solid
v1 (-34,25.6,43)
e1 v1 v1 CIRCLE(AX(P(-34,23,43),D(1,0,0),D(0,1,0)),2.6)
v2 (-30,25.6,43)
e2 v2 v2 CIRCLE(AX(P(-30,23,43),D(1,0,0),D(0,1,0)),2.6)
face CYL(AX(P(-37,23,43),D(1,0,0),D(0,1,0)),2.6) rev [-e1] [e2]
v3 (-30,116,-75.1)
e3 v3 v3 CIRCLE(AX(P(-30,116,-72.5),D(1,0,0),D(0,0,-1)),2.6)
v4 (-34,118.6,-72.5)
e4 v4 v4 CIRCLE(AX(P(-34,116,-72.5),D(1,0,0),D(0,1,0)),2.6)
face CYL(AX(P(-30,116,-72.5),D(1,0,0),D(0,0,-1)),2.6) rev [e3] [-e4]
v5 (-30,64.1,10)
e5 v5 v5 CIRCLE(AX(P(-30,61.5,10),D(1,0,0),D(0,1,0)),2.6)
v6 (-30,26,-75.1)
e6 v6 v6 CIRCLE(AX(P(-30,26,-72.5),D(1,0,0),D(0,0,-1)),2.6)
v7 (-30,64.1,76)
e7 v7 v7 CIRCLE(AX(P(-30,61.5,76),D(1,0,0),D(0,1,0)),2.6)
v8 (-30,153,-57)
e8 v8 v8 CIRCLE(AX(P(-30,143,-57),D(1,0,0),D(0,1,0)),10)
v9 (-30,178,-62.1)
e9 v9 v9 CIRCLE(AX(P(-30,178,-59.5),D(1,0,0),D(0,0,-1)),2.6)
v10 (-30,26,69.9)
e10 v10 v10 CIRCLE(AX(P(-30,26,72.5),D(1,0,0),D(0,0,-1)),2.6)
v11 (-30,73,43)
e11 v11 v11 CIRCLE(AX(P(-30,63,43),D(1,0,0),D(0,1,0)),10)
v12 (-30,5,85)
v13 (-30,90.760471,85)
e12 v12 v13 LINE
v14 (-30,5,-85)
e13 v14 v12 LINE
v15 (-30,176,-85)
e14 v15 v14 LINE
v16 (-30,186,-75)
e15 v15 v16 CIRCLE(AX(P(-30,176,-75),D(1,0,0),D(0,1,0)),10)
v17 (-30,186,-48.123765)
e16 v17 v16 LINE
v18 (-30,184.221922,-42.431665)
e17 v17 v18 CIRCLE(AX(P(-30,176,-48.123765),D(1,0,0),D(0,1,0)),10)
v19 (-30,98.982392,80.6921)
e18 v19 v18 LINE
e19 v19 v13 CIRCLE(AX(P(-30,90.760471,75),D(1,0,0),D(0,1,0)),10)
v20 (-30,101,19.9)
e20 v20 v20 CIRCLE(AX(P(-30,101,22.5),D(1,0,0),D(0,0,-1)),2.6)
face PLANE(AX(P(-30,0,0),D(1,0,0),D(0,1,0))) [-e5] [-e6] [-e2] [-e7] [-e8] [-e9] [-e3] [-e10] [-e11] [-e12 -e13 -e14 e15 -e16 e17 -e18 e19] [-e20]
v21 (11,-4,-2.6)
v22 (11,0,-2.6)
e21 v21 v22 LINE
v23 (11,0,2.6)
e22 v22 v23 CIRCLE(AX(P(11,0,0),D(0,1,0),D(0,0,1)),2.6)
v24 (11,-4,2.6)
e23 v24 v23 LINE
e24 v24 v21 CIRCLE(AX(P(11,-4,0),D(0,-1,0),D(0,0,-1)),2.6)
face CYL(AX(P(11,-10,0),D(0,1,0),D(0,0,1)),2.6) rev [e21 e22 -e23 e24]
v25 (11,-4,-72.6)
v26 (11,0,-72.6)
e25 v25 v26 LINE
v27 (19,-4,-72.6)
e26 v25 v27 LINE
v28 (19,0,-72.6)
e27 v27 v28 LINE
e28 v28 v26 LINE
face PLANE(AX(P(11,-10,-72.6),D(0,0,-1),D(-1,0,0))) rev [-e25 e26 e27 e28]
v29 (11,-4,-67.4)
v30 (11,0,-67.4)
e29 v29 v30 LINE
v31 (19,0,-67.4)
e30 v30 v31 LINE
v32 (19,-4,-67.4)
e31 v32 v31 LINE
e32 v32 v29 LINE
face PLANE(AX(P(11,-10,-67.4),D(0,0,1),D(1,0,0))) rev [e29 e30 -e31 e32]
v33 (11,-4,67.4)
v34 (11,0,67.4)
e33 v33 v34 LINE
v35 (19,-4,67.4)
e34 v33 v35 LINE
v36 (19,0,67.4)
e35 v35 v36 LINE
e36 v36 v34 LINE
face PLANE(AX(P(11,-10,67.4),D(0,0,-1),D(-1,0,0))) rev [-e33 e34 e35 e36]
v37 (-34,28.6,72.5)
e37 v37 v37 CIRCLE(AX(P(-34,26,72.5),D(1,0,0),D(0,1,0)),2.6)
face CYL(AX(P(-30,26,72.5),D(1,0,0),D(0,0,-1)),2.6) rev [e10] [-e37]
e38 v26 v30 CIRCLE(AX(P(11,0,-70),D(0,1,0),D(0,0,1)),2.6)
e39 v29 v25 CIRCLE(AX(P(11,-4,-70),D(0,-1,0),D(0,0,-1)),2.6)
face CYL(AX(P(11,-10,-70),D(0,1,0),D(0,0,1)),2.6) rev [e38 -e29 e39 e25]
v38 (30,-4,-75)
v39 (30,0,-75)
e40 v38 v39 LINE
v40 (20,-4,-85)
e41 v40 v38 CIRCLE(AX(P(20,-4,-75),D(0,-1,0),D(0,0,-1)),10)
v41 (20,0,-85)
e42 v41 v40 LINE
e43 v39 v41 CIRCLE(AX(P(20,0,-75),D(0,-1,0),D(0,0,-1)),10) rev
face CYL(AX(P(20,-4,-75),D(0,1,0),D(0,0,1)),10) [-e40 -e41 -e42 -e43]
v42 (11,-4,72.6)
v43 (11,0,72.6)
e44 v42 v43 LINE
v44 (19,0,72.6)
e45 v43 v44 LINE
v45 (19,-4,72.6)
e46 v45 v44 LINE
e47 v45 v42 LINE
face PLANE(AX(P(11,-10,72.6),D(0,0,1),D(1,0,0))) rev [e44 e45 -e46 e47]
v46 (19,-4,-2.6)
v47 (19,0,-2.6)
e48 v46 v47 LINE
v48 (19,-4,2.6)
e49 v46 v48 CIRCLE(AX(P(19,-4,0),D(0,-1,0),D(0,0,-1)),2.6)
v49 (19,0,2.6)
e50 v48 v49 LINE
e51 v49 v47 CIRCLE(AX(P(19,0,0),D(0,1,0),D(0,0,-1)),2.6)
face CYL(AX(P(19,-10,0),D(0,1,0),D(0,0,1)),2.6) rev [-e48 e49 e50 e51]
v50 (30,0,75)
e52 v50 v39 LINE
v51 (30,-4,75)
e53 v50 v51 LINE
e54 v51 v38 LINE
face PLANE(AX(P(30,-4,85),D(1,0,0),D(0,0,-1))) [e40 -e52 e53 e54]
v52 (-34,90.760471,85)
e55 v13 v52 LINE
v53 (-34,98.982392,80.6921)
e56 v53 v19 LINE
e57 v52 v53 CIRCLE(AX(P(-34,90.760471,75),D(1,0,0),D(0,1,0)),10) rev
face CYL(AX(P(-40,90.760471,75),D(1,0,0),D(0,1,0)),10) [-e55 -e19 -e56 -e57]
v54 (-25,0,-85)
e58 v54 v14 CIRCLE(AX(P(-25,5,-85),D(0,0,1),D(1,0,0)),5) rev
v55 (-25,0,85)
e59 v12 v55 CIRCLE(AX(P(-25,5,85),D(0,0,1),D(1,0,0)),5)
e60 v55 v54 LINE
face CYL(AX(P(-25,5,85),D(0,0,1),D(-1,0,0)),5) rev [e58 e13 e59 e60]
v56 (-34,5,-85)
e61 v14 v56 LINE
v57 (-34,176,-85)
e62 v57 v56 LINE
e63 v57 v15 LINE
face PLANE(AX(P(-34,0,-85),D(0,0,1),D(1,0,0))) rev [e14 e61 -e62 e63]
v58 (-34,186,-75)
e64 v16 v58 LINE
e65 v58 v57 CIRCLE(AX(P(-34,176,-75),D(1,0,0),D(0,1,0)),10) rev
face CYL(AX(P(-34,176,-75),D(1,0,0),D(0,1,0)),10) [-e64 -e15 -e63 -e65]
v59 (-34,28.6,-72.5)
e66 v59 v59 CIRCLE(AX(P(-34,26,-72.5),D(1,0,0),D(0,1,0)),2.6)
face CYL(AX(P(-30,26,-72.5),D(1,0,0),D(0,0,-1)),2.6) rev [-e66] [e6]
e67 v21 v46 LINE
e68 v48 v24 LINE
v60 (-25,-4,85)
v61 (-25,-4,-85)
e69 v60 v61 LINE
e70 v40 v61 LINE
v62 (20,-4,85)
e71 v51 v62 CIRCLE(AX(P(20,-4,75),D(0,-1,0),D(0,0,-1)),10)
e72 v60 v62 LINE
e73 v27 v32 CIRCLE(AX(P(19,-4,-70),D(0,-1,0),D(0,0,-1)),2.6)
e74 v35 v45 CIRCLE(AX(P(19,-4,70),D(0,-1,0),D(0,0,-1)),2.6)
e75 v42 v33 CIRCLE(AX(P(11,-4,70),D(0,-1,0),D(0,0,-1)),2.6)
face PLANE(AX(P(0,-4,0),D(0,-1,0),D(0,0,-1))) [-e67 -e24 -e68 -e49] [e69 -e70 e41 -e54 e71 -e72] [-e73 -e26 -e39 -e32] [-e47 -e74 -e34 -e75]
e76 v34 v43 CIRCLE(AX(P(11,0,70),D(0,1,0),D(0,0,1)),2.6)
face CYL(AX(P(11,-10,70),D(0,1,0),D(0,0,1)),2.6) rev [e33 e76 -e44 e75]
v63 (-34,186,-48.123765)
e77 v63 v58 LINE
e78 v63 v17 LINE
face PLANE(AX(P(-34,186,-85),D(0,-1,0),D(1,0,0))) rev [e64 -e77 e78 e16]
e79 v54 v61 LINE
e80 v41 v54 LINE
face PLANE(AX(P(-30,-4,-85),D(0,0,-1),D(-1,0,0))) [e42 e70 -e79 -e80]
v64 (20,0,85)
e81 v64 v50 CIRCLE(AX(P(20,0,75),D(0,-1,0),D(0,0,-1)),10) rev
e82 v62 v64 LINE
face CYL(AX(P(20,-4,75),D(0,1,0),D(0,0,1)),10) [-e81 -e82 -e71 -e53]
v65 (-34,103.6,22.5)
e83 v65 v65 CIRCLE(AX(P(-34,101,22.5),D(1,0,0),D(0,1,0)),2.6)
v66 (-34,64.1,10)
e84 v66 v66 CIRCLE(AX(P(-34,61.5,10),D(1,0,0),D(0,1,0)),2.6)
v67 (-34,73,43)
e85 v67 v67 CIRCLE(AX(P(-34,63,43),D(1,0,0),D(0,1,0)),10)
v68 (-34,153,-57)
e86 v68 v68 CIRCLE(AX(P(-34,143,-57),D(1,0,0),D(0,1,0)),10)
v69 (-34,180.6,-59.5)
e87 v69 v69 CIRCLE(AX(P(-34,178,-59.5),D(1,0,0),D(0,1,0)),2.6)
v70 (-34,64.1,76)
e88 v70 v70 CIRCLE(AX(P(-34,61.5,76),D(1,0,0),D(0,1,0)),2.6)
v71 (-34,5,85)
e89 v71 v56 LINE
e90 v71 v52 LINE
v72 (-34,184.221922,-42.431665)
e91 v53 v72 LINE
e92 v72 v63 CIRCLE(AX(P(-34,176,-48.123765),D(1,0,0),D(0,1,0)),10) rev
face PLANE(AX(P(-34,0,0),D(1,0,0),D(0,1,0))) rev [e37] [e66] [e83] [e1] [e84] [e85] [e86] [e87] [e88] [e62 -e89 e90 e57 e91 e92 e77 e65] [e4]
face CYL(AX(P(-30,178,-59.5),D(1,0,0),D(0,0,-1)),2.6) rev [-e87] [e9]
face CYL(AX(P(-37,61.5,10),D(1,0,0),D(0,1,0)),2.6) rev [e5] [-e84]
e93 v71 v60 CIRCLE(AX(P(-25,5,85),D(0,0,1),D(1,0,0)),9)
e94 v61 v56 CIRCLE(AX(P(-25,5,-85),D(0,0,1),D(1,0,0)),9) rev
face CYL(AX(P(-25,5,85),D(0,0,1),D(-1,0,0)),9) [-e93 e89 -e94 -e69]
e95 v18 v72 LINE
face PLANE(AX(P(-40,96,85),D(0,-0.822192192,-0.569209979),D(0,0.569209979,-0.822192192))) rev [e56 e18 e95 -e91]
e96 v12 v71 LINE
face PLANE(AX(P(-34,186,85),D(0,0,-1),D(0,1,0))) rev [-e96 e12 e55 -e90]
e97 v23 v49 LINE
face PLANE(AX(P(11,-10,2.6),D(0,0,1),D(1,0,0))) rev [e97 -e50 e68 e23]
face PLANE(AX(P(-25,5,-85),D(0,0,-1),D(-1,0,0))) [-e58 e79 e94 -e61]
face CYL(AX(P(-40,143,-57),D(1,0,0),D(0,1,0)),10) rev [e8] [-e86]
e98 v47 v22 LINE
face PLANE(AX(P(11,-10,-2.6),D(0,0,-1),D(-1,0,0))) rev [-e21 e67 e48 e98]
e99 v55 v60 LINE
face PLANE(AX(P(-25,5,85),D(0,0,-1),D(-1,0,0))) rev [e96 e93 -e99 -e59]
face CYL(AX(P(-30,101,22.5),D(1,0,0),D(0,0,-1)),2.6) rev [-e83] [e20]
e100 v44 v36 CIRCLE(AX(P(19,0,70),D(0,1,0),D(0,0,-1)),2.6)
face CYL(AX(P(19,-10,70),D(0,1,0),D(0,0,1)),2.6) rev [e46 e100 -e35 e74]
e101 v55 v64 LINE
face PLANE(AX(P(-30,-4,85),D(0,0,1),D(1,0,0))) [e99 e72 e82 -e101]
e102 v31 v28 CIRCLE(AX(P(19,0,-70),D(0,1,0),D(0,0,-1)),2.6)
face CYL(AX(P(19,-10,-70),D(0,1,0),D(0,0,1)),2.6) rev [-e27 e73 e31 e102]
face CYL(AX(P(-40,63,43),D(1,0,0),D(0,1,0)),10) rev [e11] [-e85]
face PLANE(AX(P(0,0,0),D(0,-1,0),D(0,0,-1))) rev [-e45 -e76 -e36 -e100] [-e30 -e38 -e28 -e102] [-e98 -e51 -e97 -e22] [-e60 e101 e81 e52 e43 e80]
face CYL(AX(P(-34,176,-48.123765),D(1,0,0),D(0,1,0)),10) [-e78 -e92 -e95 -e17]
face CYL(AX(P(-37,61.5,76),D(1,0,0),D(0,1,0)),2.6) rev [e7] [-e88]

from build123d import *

# Parameters (mm, degrees)
SKETCH1_W                    = 60
SKETCH1_H                    = 170
BASE_FLANGE1_DEPTH           = 4
EDGE_FLANGE1_STRIP_W         = 26
EDGE_FLANGE1_STRIP_H         = 4
EDGE_FLANGE1_STRIP_CUT_DEPTH = 170
EDGE_FLANGE1_DEPTH           = 170
SKETCH15_R                   = 10
CUT_EXTRUDE4_DEPTH           = 10
CUT_EXTRUDE5_DEPTH           = 10
FILLET1_R                    = 10
F_1_0MM_DOWEL_HOLE2_D        = 5.2
F_1_0MM_DOWEL_HOLE2_DEPTH    = 12.03
F_1_0MM_DOWEL_HOLE2_TIP      = 1.562237609
SKETCH33_R                   = 2.6
CUT_EXTRUDE6_DEPTH           = 7
F_1_0MM_DOWEL_HOLE3_D        = 5.2
F_1_0MM_DOWEL_HOLE3_DEPTH    = 12.03
F_1_0MM_DOWEL_HOLE3_TIP      = 1.562237609
CUT_EXTRUDE7_DEPTH           = 10


# Sheet-metal steps are written as plain solids
with BuildPart() as part:
    # Sketch1 → Base-Flange1 (new body)
    with BuildSketch(Plane(origin=(0, 0, 0), x_dir=(1, 0, 0), z_dir=(0, 1, 0))):
        Rectangle(SKETCH1_W, SKETCH1_H)
    extrude(amount=-BASE_FLANGE1_DEPTH)

    # Edge-Flange1 strip (across the edge) → Edge-Flange1 strip cut (cut)
    with BuildSketch(Plane(origin=(-30, 0, -85), x_dir=(1, 0, 0), z_dir=(0, 0, 1))):
        with Locations((-8, -2)):
            Rectangle(EDGE_FLANGE1_STRIP_W, EDGE_FLANGE1_STRIP_H)
    extrude(amount=EDGE_FLANGE1_STRIP_CUT_DEPTH, mode=Mode.SUBTRACT)

    # Edge-Flange1 section (across the edge) → Edge-Flange1 (add)
    with BuildSketch(Plane(origin=(-30, 0, -85), x_dir=(1, 0, 0), z_dir=(0, 0, 1))):
        with BuildLine():
            Line((-4, 5), (-4, 186))
            Line((-4, 186), (0, 186))
            Line((0, 186), (0, 5))
            ThreePointArc((0, 5), (1.464466094, 1.464466094), (5, 0))
            Line((5, 0), (5, -4))
            ThreePointArc((5, -4), (-1.363961031, -1.363961031), (-4, 5))
        make_face()
    extrude(amount=EDGE_FLANGE1_DEPTH)

    # Sketch15 → Cut-Extrude4 (cut)
    with BuildSketch(Plane(origin=(-30, 0, 0), x_dir=(0, 0, -1), z_dir=(1, 0, 0))):
        with Locations(Location((-43, 63, 0), (0, 0, 90))):
            Circle(SKETCH15_R)
        with Locations(Location((57, 143, 0), (0, 0, 90))):
            Circle(SKETCH15_R)
    extrude(amount=-CUT_EXTRUDE4_DEPTH, mode=Mode.SUBTRACT)

    # Sketch16 → Cut-Extrude5 (cut)
    with BuildSketch(Plane(origin=(-30, 0, 0), x_dir=(0, 0, -1), z_dir=(1, 0, 0))):
        Polygon((-85, 96), (45, 186), (-85, 186), align=None)
    extrude(amount=-CUT_EXTRUDE5_DEPTH, mode=Mode.SUBTRACT)

    # Fillet1
    fillet1_edges = [part.edges().sort_by_distance(p)[0] for p in [
        (-32, 186, -85),
        (-32, 186, -45),
        (-32, 96, 85),
        (30, -2, 85),
        (30, -2, -85),
    ]]
    fillet(fillet1_edges, radius=FILLET1_R)

    # Ø1.0mm Dowel Hole2
    with Locations(Plane(origin=(-30, 0, 0), x_dir=(0, 0, -1), z_dir=(1, 0, 0))):
        with Locations((-72.5, 26), (72.5, 26), (72.5, 116), (-22.5, 101), (59.5, 178)):
            Hole(F_1_0MM_DOWEL_HOLE2_D / 2, depth=F_1_0MM_DOWEL_HOLE2_DEPTH)
            with Locations((0, 0, -(F_1_0MM_DOWEL_HOLE2_DEPTH + F_1_0MM_DOWEL_HOLE2_TIP / 2))):  # 118° drill point
                Cone(0, F_1_0MM_DOWEL_HOLE2_D / 2, F_1_0MM_DOWEL_HOLE2_TIP, mode=Mode.SUBTRACT)

    # Sketch33 → Cut-Extrude6 (cut)
    with BuildSketch(Plane(origin=(-30, 0, 0), x_dir=(0, 0, -1), z_dir=(1, 0, 0))):
        with Locations(Location((-10, 61.5, 0), (0, 0, 90))):
            Circle(SKETCH33_R)
        with Locations(Location((-76, 61.5, 0), (0, 0, 90))):
            Circle(SKETCH33_R)
        with Locations(Location((-43, 23, 0), (0, 0, 90))):
            Circle(SKETCH33_R)
    extrude(amount=-CUT_EXTRUDE6_DEPTH, mode=Mode.SUBTRACT)

    # Ø1.0mm Dowel Hole3
    with Locations(Plane(origin=(0, 0, 0), x_dir=(1, 0, 0), z_dir=(0, 1, 0))):
        with Locations((15, 70), (15, 0), (15, -70)):
            Hole(F_1_0MM_DOWEL_HOLE3_D / 2, depth=F_1_0MM_DOWEL_HOLE3_DEPTH)
            with Locations((0, 0, -(F_1_0MM_DOWEL_HOLE3_DEPTH + F_1_0MM_DOWEL_HOLE3_TIP / 2))):  # 118° drill point
                Cone(0, F_1_0MM_DOWEL_HOLE3_D / 2, F_1_0MM_DOWEL_HOLE3_TIP, mode=Mode.SUBTRACT)

    # Sketch36 → Cut-Extrude7 (cut)
    with BuildSketch(Plane(origin=(0, 0, 0), x_dir=(1, 0, 0), z_dir=(0, 1, 0))):
        with BuildLine():
            Line((11, 67.4), (19, 67.4))
            ThreePointArc((19, 67.4), (21.6, 70), (19, 72.6))
            Line((19, 72.6), (11, 72.6))
            ThreePointArc((11, 72.6), (8.4, 70), (11, 67.4))
        make_face()
        with BuildLine():
            Line((11, -2.6), (19, -2.6))
            ThreePointArc((19, -2.6), (21.6, 0), (19, 2.6))
            Line((19, 2.6), (11, 2.6))
            ThreePointArc((11, 2.6), (8.4, 0), (11, -2.6))
        make_face()
        with BuildLine():
            Line((11, -72.6), (19, -72.6))
            ThreePointArc((19, -72.6), (21.6, -70), (19, -67.4))
            Line((19, -67.4), (11, -67.4))
            ThreePointArc((11, -67.4), (8.4, -70), (11, -72.6))
        make_face()
    extrude(amount=-CUT_EXTRUDE7_DEPTH, mode=Mode.SUBTRACT)


solid = part.part
